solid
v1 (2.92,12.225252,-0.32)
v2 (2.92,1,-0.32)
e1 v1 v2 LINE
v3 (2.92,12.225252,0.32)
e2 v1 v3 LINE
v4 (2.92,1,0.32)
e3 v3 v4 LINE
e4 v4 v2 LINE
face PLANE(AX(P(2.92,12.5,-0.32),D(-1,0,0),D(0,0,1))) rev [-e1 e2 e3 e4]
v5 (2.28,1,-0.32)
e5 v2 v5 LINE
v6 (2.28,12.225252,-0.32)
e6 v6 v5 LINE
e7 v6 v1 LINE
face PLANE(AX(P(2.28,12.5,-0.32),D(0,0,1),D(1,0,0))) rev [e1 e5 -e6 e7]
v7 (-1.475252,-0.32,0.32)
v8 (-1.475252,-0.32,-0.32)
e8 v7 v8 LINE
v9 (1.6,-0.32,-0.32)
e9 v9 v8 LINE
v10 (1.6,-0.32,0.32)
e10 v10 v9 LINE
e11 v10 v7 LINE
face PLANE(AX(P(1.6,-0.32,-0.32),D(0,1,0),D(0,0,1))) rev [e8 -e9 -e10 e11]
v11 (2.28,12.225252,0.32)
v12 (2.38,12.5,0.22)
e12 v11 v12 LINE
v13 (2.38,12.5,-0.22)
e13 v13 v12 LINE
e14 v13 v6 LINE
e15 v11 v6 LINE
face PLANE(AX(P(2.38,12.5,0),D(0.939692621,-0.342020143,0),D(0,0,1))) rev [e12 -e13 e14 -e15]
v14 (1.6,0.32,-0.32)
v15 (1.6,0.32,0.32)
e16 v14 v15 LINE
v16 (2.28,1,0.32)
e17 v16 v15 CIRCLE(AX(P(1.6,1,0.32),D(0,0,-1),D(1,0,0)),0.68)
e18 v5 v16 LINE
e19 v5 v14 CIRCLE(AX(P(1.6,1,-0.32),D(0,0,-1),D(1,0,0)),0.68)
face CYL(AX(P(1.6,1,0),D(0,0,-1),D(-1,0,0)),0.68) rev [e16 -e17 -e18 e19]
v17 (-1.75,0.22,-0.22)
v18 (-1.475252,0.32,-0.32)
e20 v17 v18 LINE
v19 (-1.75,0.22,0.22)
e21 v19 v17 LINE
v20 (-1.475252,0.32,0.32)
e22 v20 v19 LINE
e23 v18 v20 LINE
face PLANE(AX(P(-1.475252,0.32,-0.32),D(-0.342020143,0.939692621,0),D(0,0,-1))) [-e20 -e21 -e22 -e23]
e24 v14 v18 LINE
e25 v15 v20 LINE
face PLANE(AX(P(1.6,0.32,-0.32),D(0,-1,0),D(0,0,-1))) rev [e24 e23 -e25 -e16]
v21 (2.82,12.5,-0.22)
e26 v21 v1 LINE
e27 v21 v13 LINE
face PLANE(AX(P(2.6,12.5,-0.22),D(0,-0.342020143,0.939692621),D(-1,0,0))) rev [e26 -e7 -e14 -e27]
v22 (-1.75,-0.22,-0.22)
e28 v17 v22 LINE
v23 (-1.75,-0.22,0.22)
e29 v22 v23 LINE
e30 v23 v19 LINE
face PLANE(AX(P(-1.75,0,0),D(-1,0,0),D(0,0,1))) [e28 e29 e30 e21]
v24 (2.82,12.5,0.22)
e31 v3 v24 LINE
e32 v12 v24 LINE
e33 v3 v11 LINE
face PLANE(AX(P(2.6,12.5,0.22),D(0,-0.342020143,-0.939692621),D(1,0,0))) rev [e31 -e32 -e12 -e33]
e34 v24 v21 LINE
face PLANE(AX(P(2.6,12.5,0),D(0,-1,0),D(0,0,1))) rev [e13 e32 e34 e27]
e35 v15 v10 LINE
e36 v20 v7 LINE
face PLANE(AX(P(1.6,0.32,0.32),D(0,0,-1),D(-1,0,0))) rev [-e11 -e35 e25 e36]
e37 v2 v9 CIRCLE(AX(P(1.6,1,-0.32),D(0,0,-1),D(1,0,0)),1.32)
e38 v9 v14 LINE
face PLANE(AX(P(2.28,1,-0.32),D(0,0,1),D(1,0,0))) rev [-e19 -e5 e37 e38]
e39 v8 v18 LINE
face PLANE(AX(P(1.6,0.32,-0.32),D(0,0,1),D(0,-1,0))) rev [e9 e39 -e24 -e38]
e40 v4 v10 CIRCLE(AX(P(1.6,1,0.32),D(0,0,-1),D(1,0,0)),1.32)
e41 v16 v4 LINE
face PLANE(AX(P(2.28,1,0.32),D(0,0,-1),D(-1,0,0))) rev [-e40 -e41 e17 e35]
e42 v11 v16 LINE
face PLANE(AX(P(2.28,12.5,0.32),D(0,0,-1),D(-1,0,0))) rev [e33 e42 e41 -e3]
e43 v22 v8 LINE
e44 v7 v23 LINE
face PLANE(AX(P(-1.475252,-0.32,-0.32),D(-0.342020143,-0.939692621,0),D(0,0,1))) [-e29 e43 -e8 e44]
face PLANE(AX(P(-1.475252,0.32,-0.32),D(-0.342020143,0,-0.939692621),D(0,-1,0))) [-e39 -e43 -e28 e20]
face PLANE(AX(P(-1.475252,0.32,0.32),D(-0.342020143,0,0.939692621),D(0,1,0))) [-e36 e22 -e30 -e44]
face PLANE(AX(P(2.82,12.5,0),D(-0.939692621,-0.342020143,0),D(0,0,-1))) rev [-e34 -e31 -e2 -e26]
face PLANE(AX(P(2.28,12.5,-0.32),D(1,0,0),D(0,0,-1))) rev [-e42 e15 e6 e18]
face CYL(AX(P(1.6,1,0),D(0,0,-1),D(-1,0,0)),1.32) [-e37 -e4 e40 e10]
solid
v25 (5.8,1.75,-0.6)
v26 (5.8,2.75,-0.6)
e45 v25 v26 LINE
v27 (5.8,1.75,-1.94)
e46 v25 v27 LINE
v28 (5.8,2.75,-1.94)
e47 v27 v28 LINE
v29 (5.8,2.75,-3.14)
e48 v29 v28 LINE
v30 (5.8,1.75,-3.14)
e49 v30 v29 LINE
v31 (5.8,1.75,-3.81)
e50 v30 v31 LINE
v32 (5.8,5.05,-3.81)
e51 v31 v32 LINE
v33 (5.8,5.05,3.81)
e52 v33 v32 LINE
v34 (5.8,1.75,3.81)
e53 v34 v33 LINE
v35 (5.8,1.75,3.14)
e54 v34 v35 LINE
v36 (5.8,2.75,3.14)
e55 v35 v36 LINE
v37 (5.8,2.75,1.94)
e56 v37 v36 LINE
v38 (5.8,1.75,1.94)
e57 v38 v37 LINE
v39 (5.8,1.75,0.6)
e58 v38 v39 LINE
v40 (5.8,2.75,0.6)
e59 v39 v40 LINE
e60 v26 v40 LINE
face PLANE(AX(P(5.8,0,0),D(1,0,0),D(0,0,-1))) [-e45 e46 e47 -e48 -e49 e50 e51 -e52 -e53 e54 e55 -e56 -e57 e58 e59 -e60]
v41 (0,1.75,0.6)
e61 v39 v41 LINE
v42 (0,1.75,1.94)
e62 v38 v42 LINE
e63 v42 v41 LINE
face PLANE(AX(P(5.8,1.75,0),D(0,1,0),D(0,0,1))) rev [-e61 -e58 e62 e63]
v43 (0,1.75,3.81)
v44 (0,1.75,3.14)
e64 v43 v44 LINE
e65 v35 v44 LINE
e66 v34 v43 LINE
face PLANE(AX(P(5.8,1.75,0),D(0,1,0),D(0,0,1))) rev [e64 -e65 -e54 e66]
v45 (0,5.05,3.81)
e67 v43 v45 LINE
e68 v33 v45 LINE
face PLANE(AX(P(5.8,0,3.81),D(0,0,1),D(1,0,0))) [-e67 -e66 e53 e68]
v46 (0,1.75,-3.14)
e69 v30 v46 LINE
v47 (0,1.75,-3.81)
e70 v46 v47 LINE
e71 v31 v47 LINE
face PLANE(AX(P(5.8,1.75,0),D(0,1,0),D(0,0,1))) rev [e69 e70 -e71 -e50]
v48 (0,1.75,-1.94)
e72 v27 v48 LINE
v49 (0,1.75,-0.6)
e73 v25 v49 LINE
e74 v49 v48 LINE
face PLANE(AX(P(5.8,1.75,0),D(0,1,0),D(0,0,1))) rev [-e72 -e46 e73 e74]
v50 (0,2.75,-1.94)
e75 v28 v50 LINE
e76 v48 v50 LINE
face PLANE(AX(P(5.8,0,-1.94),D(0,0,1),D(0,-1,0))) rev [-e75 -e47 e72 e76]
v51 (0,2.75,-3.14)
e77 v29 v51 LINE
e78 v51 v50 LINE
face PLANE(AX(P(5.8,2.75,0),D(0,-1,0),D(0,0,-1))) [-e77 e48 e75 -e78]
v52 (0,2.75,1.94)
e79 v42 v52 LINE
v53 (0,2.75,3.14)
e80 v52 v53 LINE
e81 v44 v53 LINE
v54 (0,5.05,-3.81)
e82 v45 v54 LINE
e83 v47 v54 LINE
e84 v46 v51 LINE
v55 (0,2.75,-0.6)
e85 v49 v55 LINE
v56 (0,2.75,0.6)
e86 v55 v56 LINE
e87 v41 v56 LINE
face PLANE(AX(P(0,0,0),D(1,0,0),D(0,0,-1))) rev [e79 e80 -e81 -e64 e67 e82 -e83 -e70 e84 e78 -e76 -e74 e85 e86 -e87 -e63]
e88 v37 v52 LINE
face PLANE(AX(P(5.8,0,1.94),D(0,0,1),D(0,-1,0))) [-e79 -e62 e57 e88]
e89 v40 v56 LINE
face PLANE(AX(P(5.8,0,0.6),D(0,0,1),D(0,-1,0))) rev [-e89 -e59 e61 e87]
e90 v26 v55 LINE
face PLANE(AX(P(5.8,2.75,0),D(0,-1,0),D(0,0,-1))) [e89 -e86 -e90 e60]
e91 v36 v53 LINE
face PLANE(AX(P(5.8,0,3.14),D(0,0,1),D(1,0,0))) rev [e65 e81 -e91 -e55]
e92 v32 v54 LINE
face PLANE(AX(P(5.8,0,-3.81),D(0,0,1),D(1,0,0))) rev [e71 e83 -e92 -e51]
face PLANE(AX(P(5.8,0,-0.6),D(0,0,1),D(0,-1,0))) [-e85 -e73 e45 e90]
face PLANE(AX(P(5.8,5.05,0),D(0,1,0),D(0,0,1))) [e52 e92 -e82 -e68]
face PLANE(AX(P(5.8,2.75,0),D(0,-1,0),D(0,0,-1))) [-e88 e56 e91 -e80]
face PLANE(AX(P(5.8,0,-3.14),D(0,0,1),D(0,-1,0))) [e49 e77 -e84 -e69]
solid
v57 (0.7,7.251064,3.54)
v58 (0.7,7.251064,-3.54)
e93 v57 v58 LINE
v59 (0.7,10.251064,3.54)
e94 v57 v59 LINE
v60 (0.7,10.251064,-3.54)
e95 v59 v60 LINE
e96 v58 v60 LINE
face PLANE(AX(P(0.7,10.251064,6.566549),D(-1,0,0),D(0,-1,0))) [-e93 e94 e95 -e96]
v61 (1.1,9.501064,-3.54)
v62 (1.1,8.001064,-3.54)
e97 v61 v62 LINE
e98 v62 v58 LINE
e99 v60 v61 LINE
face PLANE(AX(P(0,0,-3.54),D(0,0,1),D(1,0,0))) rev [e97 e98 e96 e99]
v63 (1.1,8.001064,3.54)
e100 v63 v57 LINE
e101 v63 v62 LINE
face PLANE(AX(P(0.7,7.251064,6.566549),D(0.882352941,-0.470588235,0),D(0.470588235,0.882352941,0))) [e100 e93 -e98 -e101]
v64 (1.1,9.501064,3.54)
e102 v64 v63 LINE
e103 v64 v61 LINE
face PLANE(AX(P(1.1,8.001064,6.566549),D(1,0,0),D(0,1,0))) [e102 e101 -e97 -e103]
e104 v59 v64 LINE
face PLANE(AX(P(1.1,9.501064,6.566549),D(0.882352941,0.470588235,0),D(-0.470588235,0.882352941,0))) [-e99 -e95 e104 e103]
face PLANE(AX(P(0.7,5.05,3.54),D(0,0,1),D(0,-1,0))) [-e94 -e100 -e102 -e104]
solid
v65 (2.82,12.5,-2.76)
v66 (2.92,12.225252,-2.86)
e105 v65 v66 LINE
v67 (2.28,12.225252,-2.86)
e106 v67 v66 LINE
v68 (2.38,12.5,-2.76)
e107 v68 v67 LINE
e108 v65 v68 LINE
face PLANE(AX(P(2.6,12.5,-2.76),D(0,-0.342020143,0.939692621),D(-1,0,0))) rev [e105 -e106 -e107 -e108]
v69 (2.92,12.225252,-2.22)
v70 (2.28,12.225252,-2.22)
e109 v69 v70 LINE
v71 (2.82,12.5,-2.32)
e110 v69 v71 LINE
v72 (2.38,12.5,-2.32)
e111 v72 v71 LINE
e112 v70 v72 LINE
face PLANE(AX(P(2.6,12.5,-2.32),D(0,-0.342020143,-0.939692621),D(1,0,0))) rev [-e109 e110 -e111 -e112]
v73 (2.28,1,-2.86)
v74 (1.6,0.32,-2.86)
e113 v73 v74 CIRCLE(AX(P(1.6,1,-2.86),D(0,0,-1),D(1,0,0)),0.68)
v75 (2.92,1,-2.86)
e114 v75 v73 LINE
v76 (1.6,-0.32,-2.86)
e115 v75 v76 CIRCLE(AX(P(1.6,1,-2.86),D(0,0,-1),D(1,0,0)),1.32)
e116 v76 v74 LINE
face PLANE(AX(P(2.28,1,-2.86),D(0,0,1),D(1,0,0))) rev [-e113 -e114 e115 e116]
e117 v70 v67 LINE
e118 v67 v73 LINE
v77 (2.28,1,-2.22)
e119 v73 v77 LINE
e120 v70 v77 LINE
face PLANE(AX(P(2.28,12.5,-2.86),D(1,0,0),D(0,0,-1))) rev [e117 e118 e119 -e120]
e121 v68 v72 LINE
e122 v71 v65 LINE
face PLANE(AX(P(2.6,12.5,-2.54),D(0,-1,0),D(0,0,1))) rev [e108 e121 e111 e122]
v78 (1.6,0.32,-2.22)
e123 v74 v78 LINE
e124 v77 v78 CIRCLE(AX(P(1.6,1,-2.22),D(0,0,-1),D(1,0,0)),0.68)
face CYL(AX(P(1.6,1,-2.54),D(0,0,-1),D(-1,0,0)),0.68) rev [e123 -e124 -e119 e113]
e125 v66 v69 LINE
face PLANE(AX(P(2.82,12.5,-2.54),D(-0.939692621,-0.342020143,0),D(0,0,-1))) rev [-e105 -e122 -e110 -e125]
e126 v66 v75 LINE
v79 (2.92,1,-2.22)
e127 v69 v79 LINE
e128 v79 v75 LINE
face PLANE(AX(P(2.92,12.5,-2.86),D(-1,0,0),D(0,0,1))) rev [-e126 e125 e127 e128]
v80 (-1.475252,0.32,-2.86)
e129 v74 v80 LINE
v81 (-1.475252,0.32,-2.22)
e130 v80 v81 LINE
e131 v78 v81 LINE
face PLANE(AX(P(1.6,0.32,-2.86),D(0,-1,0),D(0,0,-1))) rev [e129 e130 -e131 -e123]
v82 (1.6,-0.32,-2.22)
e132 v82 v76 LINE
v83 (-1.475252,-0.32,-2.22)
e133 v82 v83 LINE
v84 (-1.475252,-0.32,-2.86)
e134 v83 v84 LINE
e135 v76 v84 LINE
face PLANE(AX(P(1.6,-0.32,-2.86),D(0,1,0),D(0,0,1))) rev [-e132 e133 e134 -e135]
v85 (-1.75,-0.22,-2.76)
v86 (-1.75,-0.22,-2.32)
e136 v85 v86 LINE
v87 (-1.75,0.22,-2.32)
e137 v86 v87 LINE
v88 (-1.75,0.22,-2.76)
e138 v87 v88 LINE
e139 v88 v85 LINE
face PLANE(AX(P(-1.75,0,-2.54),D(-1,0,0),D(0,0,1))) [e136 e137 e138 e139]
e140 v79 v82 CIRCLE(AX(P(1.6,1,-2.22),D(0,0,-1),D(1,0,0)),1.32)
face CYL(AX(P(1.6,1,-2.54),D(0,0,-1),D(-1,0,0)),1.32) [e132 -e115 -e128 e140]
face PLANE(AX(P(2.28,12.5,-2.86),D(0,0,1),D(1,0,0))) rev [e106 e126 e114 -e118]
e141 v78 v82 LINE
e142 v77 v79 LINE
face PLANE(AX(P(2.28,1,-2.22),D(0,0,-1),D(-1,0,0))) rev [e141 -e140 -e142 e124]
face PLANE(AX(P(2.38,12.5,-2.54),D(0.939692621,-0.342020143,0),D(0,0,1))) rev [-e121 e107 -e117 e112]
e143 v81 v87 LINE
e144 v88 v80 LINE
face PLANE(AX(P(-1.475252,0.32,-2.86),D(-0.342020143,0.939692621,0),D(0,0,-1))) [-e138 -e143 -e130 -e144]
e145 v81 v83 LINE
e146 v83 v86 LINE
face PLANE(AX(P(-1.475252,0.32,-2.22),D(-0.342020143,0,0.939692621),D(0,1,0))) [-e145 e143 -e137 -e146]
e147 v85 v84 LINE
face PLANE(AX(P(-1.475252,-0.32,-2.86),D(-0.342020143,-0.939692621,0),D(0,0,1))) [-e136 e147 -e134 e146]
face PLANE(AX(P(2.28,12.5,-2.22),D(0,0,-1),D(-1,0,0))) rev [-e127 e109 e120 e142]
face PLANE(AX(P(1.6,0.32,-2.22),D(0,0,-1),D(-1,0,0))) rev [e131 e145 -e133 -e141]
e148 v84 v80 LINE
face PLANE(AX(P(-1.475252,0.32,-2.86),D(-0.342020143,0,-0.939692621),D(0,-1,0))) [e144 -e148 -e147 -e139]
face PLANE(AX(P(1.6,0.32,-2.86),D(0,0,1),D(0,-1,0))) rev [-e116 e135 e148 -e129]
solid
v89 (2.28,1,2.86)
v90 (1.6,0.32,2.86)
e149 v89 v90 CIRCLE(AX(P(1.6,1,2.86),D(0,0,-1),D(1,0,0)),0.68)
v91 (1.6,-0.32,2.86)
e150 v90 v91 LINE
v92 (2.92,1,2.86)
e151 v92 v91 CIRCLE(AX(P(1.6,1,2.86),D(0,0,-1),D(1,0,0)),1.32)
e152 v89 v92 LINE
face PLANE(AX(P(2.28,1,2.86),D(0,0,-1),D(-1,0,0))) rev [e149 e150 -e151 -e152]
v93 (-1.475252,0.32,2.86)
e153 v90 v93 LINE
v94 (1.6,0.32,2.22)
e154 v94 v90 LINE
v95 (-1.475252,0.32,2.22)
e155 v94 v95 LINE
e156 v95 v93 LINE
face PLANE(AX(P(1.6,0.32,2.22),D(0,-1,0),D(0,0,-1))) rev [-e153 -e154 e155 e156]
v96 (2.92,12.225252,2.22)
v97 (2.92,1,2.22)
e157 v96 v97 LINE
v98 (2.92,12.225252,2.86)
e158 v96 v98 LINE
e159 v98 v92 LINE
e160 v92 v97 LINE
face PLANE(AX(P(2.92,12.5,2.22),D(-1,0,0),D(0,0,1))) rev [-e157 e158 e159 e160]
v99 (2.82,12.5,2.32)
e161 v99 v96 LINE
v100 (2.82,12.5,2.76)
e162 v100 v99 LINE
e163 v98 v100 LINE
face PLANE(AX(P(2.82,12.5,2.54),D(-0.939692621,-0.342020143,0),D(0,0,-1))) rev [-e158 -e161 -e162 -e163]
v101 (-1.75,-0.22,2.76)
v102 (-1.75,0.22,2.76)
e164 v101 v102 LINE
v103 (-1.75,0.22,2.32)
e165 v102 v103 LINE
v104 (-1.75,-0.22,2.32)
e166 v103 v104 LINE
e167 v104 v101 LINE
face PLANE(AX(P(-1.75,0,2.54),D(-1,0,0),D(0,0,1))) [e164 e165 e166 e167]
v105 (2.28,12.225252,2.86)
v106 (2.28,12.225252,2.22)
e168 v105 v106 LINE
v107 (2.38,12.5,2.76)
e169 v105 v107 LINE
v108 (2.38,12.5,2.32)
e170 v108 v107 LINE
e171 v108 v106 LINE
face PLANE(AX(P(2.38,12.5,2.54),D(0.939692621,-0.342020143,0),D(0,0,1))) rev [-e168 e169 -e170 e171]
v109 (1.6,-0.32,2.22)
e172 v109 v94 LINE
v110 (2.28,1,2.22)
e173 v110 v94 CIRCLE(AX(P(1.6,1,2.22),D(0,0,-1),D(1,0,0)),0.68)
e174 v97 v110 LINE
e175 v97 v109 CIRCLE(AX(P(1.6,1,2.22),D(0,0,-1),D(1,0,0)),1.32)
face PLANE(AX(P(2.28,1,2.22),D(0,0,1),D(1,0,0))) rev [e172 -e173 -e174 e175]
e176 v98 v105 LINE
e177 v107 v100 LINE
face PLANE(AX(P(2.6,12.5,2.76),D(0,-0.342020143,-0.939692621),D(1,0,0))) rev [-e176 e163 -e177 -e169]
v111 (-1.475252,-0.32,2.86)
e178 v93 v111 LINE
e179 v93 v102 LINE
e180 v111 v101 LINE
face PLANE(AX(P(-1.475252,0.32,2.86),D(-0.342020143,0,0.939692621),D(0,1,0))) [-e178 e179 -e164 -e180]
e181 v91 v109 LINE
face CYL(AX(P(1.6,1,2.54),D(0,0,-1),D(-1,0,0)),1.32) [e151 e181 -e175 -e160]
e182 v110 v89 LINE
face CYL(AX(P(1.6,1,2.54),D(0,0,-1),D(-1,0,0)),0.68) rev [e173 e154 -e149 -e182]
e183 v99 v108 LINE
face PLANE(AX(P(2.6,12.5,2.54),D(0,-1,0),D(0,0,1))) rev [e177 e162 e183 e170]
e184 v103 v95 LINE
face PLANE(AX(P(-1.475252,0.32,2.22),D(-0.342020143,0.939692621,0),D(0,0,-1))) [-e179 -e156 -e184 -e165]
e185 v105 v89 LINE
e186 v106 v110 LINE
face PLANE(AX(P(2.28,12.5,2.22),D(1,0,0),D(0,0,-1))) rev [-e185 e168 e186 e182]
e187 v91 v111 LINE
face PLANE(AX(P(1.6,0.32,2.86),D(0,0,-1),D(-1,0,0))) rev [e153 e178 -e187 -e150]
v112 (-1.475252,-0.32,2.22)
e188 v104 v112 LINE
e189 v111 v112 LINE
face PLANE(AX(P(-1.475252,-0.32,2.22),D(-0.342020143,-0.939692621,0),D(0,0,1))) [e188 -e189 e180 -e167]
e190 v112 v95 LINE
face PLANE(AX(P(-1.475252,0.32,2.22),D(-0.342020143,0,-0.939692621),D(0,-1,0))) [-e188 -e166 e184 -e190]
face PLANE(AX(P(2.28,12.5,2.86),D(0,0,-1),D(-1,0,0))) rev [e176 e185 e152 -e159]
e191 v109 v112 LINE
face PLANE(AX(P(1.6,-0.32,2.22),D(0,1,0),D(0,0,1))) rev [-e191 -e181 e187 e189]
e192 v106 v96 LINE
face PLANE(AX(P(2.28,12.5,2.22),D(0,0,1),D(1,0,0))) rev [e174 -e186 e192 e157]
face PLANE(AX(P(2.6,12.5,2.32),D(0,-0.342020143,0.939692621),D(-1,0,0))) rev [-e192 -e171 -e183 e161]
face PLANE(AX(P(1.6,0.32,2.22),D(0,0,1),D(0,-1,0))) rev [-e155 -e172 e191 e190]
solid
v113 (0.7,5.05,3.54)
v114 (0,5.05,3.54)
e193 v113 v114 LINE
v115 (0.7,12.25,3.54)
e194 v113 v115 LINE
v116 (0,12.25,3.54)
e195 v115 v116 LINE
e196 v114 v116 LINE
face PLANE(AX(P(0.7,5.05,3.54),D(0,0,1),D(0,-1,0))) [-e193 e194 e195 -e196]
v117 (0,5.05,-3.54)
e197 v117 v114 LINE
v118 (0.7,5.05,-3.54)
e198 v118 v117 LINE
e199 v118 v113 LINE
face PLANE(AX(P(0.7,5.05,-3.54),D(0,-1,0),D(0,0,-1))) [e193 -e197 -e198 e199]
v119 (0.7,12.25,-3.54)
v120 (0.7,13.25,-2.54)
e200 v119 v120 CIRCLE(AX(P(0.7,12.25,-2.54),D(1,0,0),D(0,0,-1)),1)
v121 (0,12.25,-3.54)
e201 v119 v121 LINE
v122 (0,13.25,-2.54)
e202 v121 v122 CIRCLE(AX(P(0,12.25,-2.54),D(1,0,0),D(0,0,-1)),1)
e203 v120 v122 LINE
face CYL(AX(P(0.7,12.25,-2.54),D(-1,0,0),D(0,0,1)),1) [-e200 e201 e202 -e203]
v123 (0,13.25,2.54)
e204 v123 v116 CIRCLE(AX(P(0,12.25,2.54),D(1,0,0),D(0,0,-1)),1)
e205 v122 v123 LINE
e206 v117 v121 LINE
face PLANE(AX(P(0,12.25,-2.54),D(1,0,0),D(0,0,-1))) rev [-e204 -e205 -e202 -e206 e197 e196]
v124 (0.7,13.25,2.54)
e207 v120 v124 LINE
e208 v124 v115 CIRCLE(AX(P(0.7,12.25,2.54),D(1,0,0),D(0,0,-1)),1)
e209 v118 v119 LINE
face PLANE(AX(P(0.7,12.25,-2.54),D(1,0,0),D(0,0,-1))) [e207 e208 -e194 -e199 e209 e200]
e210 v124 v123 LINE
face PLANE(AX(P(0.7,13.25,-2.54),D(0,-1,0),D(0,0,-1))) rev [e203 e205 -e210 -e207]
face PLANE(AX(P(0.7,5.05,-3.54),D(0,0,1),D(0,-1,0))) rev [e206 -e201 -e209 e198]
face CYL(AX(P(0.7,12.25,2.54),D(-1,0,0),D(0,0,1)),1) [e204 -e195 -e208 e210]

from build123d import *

# Parameters (mm, degrees)
SKETCH_1_W             = 0.64
SKETCH_1_H             = 0.64
CHAMFER_1_SIZE         = 0.1
CHAMFER_1_SIZE2        = 0.274747742
CHAMFER_2_SIZE         = 0.1
CHAMFER_2_SIZE2        = 0.274747742
PATTERN_LINEAR_3_COUNT = 2
PATTERN_LINEAR_3_PITCH = 2.54
EXTRUDE_1_DEPTH        = 5.8
EXTRUDE_2_DEPTH        = 0.7
EXTRUDE_3_DEPTH        = 7.08


with BuildPart() as part:
    # По траектории1: sweep along a curve in space
    with BuildLine() as sweep_1_path:
        Line((0, 0, 0), (-1.75, 0, 0))
        Line((0, 0, 0), (1.6, 0, 0))
        ThreePointArc((1.6, 0, 0), (2.307106781, 0.292893219, 0), (2.6, 1, 0))
        Line((2.6, 1, 0), (2.6, 12.5, 0))
    # Эскиз1 → По траектории1 (sweep)
    with BuildSketch(Plane(origin=(0, 0, 0), x_dir=(0, 0, -1), z_dir=(1, 0, 0))):
        Rectangle(SKETCH_1_W, SKETCH_1_H)
    sweep(path=sweep_1_path.line)

    # Фаска1
    chamfer_1_edges = [part.edges().sort_by_distance(p)[0] for p in [
        (2.92, 12.5, 0),
        (2.6, 12.5, -0.32),
        (2.28, 12.5, 0),
        (2.6, 12.5, 0.32),
    ]]
    chamfer_1_side = [part.faces().sort_by_distance(p)[0] for p in [
        (2.6, 12.5, 0),
    ]]
    chamfer(chamfer_1_edges, length=CHAMFER_1_SIZE, length2=CHAMFER_1_SIZE2, reference=chamfer_1_side[0])

    # Фаска2
    chamfer_2_edges = [part.edges().sort_by_distance(p)[0] for p in [
        (-1.75, 0, 0.32),
        (-1.75, -0.32, 0),
        (-1.75, 0, -0.32),
        (-1.75, 0.32, 0),
    ]]
    chamfer_2_side = [part.faces().sort_by_distance(p)[0] for p in [
        (-1.75, 0, 0),
    ]]
    chamfer(chamfer_2_edges, length=CHAMFER_2_SIZE, length2=CHAMFER_2_SIZE2, reference=chamfer_2_side[0])


with BuildPart() as body_2:
    # Линейный массив2: read off the stored shape, not the designer's step
    # Линейный массив2: copy of part
    add(part.part.moved(Location((0, 0, -2.54))))


with BuildPart() as pattern_linear_3_1:
    # Линейный массив3: pattern copy
    add(part.part.moved(Location(Vector(0, 0, 1) * (1 * PATTERN_LINEAR_3_PITCH))))


with BuildPart() as body_4:
    # Эскиз2 → Бобышка-Вытянуть1 (new body)
    with BuildSketch(Plane(origin=(0, 0, 0), x_dir=(0, 0, -1), z_dir=(1, 0, 0))):
        Polygon((0.6, 2.75), (0.6, 1.75), (1.94, 1.75), (1.94, 2.75), (3.14, 2.75), (3.14, 1.75), (3.81, 1.75), (3.81, 5.05), (-3.81, 5.05), (-3.81, 1.75), (-3.14, 1.75), (-3.14, 2.75), (-1.94, 2.75), (-1.94, 1.75), (-0.6, 1.75), (-0.6, 2.75), align=None)
    extrude(amount=EXTRUDE_1_DEPTH)


with BuildPart() as body_5:
    # Эскиз3 → Бобышка-Вытянуть2 (new body)
    with BuildSketch(Plane.ZY):
        with BuildLine():
            Line((-3.54, 5.05), (3.54, 5.05))
            Line((3.54, 5.05), (3.54, 12.25))
            ThreePointArc((3.54, 12.25), (3.247106781, 12.957106781), (2.54, 13.25))
            Line((2.54, 13.25), (-2.54, 13.25))
            ThreePointArc((-2.54, 13.25), (-3.247106781, 12.957106781), (-3.54, 12.25))
            Line((-3.54, 12.25), (-3.54, 5.05))
        make_face()
    extrude(amount=-EXTRUDE_2_DEPTH)


with BuildPart() as body_6:
    # Эскиз4 → Бобышка-Вытянуть3 (new body)
    with BuildSketch(Plane(origin=(0, 0, -3.54), x_dir=(-1, 0, 0), z_dir=(0, 0, -1))):
        Polygon((-0.7, 7.251063618), (-1.1, 8.001063618), (-1.1, 9.501063618), (-0.7, 10.251063618), align=None)
    extrude(amount=-EXTRUDE_3_DEPTH)


solid = Compound([part.part, body_2.part, pattern_linear_3_1.part, body_4.part, body_5.part, body_6.part])
